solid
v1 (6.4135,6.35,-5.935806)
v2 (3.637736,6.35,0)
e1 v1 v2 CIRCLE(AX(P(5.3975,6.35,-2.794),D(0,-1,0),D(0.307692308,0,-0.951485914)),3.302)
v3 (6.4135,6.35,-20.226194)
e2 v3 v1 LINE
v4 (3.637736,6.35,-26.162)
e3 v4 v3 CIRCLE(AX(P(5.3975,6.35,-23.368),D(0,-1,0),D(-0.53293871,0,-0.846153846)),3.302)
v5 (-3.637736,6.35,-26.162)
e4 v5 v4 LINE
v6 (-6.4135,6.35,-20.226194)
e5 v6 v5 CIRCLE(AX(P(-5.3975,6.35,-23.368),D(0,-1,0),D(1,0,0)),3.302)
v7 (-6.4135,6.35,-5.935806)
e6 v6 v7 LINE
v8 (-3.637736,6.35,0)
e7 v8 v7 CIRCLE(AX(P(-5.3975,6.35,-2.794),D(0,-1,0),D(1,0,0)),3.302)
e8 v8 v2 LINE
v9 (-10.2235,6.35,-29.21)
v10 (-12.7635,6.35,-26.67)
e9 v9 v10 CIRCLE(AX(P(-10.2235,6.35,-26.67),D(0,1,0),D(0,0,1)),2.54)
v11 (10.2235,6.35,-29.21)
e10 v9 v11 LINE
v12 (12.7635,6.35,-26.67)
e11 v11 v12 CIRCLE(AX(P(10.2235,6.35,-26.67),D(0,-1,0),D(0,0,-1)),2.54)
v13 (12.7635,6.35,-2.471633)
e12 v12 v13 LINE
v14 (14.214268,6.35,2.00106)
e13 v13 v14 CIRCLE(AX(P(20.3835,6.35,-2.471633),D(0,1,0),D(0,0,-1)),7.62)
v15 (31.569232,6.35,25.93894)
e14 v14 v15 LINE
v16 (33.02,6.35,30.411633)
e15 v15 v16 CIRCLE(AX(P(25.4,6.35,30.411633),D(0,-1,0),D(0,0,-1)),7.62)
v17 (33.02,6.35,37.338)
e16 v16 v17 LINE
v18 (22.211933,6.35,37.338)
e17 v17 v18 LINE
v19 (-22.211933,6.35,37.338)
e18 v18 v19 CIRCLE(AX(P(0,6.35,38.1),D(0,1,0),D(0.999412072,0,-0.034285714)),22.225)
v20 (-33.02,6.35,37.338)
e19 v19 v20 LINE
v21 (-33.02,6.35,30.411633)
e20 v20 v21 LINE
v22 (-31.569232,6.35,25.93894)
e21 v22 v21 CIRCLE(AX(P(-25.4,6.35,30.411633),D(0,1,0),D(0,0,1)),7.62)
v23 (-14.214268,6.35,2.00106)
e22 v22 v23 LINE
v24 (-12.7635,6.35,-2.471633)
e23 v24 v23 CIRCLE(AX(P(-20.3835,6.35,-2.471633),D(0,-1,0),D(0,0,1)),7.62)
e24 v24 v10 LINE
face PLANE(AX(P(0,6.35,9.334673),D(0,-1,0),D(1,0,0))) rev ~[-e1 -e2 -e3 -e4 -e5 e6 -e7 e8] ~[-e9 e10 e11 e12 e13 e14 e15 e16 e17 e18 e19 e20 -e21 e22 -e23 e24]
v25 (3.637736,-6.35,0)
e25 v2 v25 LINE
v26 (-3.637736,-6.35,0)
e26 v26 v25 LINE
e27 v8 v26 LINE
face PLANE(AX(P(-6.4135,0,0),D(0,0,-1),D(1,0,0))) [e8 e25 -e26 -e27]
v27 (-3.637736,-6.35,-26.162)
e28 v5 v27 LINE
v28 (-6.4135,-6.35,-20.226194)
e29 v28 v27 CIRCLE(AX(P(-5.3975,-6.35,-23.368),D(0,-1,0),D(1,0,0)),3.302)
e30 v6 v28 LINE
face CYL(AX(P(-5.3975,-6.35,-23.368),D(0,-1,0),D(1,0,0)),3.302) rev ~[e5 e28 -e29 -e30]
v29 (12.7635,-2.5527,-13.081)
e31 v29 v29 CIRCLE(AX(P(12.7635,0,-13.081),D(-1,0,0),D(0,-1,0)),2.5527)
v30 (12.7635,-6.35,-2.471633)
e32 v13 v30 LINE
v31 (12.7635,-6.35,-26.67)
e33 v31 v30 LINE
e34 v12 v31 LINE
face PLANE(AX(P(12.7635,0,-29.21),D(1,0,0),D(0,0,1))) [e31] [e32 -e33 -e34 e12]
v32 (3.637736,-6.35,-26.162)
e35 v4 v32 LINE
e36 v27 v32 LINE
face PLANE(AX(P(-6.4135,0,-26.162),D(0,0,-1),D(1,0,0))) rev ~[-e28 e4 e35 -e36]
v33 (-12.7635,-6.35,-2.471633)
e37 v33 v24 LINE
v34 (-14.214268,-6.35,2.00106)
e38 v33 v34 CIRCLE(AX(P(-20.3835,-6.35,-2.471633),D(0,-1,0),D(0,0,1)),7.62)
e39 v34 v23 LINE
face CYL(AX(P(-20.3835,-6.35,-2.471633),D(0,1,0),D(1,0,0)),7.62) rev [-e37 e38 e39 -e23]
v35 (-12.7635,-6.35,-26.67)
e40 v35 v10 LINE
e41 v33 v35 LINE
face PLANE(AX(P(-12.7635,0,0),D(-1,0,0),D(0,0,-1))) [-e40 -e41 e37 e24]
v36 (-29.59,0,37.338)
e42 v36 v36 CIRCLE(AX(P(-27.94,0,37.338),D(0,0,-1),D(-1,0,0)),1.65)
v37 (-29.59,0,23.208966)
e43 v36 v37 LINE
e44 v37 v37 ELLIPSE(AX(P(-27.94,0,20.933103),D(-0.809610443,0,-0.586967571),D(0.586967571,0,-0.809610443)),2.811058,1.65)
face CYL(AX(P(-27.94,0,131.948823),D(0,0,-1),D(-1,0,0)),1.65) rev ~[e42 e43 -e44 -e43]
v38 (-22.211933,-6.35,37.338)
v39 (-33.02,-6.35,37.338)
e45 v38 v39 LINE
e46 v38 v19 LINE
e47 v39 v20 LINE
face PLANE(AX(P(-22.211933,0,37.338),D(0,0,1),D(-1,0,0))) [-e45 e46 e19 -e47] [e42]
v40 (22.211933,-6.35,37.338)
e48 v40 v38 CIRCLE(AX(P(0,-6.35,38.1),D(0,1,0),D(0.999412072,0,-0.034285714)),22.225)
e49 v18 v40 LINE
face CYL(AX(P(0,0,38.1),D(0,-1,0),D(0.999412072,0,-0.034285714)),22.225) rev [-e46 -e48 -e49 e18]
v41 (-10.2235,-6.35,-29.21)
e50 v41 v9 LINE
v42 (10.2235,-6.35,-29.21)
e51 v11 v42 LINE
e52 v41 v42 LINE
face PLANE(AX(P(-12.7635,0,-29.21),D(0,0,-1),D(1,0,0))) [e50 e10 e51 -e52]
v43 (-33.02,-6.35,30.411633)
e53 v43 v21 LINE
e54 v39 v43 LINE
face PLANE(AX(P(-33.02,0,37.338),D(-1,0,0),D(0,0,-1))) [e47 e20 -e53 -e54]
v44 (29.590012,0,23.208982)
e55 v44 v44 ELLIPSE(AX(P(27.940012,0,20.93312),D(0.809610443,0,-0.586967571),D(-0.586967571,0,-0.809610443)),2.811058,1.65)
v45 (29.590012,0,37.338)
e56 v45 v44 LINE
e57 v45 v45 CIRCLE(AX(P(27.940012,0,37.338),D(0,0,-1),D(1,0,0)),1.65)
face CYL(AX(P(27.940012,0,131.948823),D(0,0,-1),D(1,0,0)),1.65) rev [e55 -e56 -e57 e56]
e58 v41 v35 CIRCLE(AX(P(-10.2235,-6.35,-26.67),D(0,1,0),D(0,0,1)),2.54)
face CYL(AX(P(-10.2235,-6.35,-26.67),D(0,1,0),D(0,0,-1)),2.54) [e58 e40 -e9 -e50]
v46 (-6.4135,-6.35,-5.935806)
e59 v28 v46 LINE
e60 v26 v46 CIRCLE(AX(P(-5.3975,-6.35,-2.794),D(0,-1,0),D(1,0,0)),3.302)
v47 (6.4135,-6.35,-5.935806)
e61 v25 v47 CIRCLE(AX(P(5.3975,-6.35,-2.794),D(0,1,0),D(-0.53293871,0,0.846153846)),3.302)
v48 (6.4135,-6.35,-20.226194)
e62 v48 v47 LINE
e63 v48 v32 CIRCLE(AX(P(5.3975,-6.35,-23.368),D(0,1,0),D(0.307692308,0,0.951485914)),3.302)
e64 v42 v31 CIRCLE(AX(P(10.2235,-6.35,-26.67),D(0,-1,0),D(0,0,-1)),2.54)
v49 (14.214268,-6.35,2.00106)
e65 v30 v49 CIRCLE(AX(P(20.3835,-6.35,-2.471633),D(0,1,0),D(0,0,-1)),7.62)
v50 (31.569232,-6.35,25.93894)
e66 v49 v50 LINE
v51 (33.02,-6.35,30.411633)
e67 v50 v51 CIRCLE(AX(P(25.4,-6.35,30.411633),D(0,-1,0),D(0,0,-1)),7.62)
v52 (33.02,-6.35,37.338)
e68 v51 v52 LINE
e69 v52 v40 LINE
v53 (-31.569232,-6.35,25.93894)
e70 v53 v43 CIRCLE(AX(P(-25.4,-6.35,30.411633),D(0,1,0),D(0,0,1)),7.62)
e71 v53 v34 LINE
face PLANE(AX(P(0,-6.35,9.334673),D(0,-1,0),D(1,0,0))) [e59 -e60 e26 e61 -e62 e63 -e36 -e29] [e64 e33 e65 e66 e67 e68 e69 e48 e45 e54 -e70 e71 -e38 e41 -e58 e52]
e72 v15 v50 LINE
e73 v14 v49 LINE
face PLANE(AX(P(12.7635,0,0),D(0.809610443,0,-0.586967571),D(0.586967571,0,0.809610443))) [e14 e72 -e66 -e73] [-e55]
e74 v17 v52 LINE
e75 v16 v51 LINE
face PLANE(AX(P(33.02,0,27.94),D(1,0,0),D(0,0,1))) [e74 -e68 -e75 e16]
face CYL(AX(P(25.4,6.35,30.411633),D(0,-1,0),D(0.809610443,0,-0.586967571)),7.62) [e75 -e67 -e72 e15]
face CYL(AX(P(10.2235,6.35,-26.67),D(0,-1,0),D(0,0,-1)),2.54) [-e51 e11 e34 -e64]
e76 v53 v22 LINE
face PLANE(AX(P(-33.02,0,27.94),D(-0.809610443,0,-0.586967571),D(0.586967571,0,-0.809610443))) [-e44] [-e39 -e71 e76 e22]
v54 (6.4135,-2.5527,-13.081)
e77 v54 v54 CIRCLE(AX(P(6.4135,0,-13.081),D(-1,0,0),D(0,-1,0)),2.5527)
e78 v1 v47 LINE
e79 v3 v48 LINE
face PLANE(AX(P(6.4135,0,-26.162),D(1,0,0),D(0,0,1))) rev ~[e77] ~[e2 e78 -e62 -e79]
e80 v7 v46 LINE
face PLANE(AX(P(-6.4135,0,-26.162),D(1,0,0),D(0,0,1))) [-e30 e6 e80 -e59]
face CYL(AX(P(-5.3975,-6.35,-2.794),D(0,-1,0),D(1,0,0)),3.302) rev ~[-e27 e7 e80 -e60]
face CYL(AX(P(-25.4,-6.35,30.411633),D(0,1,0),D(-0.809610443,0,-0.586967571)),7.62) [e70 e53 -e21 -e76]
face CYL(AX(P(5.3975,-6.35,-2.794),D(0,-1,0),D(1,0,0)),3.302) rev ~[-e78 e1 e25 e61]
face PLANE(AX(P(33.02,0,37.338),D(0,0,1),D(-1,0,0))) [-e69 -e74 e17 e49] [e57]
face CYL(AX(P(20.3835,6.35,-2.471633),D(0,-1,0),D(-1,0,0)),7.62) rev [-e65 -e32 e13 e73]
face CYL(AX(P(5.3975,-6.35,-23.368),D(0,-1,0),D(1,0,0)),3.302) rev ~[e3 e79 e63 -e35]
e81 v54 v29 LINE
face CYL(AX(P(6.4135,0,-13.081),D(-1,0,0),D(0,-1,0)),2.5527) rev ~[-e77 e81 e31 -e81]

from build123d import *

# Parameters (mm, degrees)
F0_W     = 12.827
F0_H     = 26.162
F1_DEPTH = 6.35
F3_D     = 5.1054
F3_DEPTH = 26.6075
F5_D     = 3.3
F6_R     = 3.302
F7_DEPTH = 12.701
F8_R     = 2.54
F9_R     = 7.62
F10_R    = 7.62


# Not quite as in the source:
# - a pattern or mirror of a feature is missing from the dataset's text; its kind, count and spacing are read off the source's solid


with BuildPart() as f1:
    # F0 (on Front) → F1 (new body, symmetric)
    with BuildSketch(Plane.XZ):
        with BuildLine():
            Line((-12.7635, -29.21), (12.7635, -29.21))
            Line((12.7635, -29.21), (12.7635, 0))
            Line((12.7635, 0), (33.02, 27.94))
            Line((33.02, 27.94), (33.02, 37.338))
            Line((33.02, 37.338), (22.2119333017, 37.338))
            ThreePointArc((22.2119333017, 37.338), (0, 15.875), (-22.2119333017, 37.338))
            Line((-22.2119333017, 37.338), (-33.02, 37.338))
            Line((-33.02, 37.338), (-33.02, 27.94))
            Line((-33.02, 27.94), (-12.7635, 0))
            Line((-12.7635, 0), (-12.7635, -29.21))
        make_face()
        with Locations((0, -13.081)):
            Rectangle(F0_W, F0_H, mode=Mode.SUBTRACT)
    extrude(amount=F1_DEPTH, both=True)

    # F3 (through all, one way)
    with BuildSketch(Plane(origin=(6.4135, 0, 0), x_dir=(0, -1, 0), z_dir=(-1, 0, 0))):
        with Locations((0, -13.081)):
            Circle(F3_D / 2)
    extrude(amount=-F3_DEPTH, mode=Mode.SUBTRACT)

    # F5 (through all)
    with Locations(Plane.XY.offset(37.338)):
        with Locations((-27.94, 0)):
            f5 = Hole(F5_D / 2)

    # F5_copies: F5 across plane
    add(f5.mirror(Plane(origin=(6e-06, 0, 0), x_dir=(0, 0, 1), z_dir=(1, 0, 0))), mode=Mode.SUBTRACT)

    # F6 (on face) → F7 (cut, through all)
    with BuildSketch(Plane.XZ.offset(6.35)):
        with Locations((-5.3975, -2.794)):
            Circle(F6_R)
        with Locations((-5.3975, -23.368)):
            Circle(F6_R)
        with Locations((5.3975, -2.794)):
            Circle(F6_R)
        with Locations((5.3975, -23.368)):
            Circle(F6_R)
    extrude(amount=-F7_DEPTH, mode=Mode.SUBTRACT)

    # F8
    f8_edges = [f1.edges().sort_by_distance(p)[0] for p in [
        (12.7635, 0, -29.21),
        (-12.7635, 0, -29.21),
    ]]
    fillet(f8_edges, radius=F8_R)

    # F9
    f9_edges = [f1.edges().sort_by_distance(p)[0] for p in [
        (12.7635, 0, 0),
        (-12.7635, 0, 0),
    ]]
    fillet(f9_edges, radius=F9_R)

    # F10
    f10_edges = [f1.edges().sort_by_distance(p)[0] for p in [
        (33.02, 0, 27.94),
        (-33.02, 0, 27.94),
    ]]
    fillet(f10_edges, radius=F10_R)


solid = f1.part
